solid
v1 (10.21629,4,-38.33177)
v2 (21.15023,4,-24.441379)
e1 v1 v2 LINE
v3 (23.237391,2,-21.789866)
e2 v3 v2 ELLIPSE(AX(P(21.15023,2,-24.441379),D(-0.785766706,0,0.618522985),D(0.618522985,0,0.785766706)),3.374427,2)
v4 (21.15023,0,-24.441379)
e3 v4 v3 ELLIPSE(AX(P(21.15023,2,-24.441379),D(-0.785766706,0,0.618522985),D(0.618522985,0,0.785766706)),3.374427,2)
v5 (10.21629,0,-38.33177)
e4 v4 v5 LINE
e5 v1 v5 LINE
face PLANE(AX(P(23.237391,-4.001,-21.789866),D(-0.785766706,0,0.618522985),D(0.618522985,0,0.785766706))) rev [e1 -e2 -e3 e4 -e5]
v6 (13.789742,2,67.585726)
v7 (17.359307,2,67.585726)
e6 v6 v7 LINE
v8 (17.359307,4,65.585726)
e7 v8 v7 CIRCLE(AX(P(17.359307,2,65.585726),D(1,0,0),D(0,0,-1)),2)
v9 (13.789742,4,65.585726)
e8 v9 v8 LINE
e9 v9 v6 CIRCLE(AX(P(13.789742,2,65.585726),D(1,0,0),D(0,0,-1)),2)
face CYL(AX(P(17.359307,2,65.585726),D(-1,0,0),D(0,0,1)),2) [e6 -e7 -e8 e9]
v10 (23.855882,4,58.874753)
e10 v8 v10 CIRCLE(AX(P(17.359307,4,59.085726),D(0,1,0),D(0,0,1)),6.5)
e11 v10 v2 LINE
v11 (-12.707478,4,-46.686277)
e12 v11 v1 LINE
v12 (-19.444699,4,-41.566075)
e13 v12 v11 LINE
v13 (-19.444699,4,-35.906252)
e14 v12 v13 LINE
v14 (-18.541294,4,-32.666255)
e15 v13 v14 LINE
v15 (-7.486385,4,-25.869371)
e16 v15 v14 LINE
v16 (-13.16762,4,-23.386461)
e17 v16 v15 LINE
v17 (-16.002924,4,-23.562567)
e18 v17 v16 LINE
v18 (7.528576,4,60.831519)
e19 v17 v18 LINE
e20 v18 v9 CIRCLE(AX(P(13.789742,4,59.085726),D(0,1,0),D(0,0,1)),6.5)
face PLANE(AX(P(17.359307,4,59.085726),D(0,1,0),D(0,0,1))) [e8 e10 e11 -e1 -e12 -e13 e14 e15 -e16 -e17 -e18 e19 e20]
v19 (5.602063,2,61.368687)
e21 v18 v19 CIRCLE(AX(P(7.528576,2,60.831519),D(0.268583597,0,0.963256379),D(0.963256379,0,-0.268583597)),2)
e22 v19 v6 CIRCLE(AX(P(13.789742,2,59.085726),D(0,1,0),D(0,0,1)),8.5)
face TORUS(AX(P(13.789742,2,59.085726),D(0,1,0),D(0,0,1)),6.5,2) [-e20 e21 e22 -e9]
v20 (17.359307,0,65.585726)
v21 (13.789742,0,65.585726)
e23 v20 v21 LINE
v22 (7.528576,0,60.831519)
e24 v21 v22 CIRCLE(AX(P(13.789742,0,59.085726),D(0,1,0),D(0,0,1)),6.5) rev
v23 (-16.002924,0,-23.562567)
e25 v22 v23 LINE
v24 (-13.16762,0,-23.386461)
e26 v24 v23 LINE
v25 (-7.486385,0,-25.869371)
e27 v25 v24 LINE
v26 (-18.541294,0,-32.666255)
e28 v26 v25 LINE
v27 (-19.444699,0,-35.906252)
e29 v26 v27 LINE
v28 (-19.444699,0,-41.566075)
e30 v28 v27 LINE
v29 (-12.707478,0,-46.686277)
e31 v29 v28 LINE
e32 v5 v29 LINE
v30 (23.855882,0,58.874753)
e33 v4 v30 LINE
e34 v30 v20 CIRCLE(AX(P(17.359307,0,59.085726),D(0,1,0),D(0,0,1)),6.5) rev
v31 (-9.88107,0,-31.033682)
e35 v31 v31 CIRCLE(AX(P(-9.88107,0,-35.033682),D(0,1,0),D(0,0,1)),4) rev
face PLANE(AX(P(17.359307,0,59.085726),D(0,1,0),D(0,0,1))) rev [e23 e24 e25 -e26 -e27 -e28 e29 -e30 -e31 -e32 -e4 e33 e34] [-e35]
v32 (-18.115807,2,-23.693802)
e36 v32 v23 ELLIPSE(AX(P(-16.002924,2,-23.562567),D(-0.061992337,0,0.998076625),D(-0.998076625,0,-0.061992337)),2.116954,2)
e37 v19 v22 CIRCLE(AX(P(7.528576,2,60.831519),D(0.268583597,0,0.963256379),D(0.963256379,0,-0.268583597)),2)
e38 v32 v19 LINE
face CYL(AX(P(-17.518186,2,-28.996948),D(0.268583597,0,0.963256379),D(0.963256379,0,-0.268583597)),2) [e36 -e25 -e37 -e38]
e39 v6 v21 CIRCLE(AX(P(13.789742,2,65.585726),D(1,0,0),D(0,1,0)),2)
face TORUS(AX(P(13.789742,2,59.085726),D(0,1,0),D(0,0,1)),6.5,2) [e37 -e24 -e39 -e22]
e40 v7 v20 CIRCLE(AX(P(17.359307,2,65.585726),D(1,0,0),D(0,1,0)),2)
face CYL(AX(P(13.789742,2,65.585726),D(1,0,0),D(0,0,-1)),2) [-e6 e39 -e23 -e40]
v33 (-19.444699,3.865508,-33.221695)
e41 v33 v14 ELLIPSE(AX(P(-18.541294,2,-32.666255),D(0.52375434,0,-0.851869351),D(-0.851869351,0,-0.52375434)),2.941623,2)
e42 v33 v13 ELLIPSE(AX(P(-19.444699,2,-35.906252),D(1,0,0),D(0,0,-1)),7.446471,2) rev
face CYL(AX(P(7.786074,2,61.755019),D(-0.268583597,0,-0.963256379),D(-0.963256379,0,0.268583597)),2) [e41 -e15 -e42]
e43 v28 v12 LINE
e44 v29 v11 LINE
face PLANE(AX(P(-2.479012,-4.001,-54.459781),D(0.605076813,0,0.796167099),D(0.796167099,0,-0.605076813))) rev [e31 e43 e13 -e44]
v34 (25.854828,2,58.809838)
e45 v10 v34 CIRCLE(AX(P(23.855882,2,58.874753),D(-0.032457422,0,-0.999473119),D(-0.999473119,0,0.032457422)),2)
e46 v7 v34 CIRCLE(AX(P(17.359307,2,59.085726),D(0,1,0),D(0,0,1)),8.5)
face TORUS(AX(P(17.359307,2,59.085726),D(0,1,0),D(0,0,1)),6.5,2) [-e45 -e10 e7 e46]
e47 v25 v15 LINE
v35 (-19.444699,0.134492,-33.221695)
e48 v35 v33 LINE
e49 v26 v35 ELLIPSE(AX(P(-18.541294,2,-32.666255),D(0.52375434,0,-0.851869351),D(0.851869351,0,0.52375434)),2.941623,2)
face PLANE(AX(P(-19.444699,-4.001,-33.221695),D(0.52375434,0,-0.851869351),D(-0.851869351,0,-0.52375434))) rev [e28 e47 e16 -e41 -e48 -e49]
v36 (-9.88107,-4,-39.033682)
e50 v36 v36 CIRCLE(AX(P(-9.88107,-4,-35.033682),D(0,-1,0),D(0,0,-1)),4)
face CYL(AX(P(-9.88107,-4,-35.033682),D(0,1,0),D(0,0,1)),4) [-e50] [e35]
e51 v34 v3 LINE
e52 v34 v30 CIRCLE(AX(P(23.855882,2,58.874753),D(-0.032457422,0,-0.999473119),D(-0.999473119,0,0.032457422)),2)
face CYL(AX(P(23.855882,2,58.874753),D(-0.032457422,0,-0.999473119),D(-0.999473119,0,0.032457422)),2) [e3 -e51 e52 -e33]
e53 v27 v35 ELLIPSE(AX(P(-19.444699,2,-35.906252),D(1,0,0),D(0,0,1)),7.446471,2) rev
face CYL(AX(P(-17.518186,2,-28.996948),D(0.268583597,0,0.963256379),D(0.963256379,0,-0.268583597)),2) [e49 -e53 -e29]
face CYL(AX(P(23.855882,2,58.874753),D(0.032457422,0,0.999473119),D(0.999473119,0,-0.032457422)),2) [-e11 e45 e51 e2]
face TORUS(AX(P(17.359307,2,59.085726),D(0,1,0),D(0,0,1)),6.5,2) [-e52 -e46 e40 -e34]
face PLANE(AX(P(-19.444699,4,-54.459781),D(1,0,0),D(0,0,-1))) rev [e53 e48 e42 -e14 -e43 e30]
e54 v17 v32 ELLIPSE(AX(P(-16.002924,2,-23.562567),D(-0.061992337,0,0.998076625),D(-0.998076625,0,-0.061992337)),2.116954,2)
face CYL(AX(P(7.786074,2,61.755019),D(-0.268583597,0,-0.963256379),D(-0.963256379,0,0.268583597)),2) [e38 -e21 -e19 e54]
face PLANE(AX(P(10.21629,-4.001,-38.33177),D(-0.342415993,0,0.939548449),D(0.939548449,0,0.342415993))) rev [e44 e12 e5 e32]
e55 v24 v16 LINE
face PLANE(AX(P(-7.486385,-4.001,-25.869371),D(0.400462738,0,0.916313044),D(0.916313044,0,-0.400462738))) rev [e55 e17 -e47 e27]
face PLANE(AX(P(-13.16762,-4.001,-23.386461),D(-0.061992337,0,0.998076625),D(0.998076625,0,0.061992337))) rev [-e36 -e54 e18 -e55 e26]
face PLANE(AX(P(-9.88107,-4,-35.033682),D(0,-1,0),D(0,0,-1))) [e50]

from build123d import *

# Parameters (mm, degrees)
BOSS_EXTRUDE1_DEPTH = 4
FILLET5_R           = 2
SKETCH3_R           = 4
BOSS_EXTRUDE2_DEPTH = 4
CUT_EXTRUDE1_START  = -8
CUT_EXTRUDE1_DEPTH  = 8
CUT_EXTRUDE2_REACH  = 74.805


with BuildPart() as part:
    # Sketch2 → Boss-Extrude1 (new body)
    with BuildSketch(Plane(origin=(0, 0, 0), x_dir=(1, 0, 0), z_dir=(0, 1, 0))):
        with BuildLine():
            Line((-19.444698737, 54.4597806), (-19.444698737, 28.4597806))
            Line((-19.444698737, 28.4597806), (5.602062826, -61.368686618))
            ThreePointArc((5.602062826, -61.368686618), (8.649467973, -65.855333302), (13.789742047, -67.585726043))
            Line((13.789742047, -67.585726043), (17.359306877, -67.585726043))
            ThreePointArc((17.359306877, -67.585726043), (23.466476793, -64.997787917), (25.854828389, -58.809837951))
            Line((25.854828389, -58.809837951), (22.177110502, 54.439455621))
            Line((22.177110502, 54.439455621), (22.802984938, 54.4597806))
            Line((22.802984938, 54.4597806), (-19.444698737, 54.4597806))
        make_face()
    extrude(amount=BOSS_EXTRUDE1_DEPTH)

    # Fillet5
    fillet5_edges = [part.edges().sort_by_distance(p)[0] for p in [
        (24.015969445, 4, 2.185191165),
        (23.466476793, 4, 64.997787917),
        (15.574524462, 4, 67.585726043),
        (8.649467973, 4, 65.855333302),
        (24.015969445, 0, 2.185191165),
        (23.466476793, 0, 64.997787917),
        (15.574524462, 0, 67.585726043),
        (8.649467973, 0, 65.855333302),
        (-19.444698737, 2, -28.4597806),
        (-6.921317955, 4, 16.454453009),
        (-6.921317955, 0, 16.454453009),
    ]]
    fillet(fillet5_edges, radius=FILLET5_R - 0.0001)  # a hair under: the kernel refuses the full size

    # Sketch3 → Boss-Extrude2 (add)
    with BuildSketch(Plane.XZ):
        with Locations(Location((-9.881069751, -35.033682073, 0), (0, 0, 90))):
            Circle(SKETCH3_R)
    extrude(amount=BOSS_EXTRUDE2_DEPTH)

    # Sketch4 → Cut-Extrude1 (cut)
    with BuildSketch(Plane(origin=(0, 4, 0), x_dir=(1, 0, 0), z_dir=(0, 1, 0)).offset(CUT_EXTRUDE1_START)):
        Polygon((23.237390651, 21.78986649), (-2.479011749, 54.4597806), (-19.444698737, 41.566075464), (-32.323067486, 58.511582656), (23.237390651, 102.246472628), (62.340489493, 52.570205291), align=None)
    extrude(amount=CUT_EXTRUDE1_DEPTH, mode=Mode.SUBTRACT)

    # Sketch5 → Cut-Extrude2 (cut, up to next)
    with BuildSketch(Plane(origin=(0, 4, 0), x_dir=(1, 0, 0), z_dir=(0, 1, 0)), mode=Mode.PRIVATE) as cut_extrude2_sk1:
        Polygon((10.216290077, 38.331769621), (-12.707477704, 46.686277287), (-5.274739107, 62.107031808), align=None)
    cut_extrude2_tool1 = extrude(cut_extrude2_sk1.sketch, amount=-CUT_EXTRUDE2_REACH, mode=Mode.PRIVATE) & part.part
    # Sketch5 → Cut-Extrude2 (cut, up to next)
    with BuildSketch(Plane(origin=(0, 4, 0), x_dir=(1, 0, 0), z_dir=(0, 1, 0)), mode=Mode.PRIVATE) as cut_extrude2_sk2:
        Polygon((-19.444698737, 33.221694621), (-7.48638486, 25.86937143), (-13.167620162, 23.386461187), (-19.9430193, 23.807293431), align=None)
    cut_extrude2_tool2 = extrude(cut_extrude2_sk2.sketch, amount=-CUT_EXTRUDE2_REACH, mode=Mode.PRIVATE) & part.part
    add(cut_extrude2_tool1.solids().sort_by_distance((-2.588642, 4, -49.041693))[0], mode=Mode.SUBTRACT)
    add(cut_extrude2_tool2.solids().sort_by_distance((-15.327917, 4, -27.167771))[0], mode=Mode.SUBTRACT)


solid = part.part
